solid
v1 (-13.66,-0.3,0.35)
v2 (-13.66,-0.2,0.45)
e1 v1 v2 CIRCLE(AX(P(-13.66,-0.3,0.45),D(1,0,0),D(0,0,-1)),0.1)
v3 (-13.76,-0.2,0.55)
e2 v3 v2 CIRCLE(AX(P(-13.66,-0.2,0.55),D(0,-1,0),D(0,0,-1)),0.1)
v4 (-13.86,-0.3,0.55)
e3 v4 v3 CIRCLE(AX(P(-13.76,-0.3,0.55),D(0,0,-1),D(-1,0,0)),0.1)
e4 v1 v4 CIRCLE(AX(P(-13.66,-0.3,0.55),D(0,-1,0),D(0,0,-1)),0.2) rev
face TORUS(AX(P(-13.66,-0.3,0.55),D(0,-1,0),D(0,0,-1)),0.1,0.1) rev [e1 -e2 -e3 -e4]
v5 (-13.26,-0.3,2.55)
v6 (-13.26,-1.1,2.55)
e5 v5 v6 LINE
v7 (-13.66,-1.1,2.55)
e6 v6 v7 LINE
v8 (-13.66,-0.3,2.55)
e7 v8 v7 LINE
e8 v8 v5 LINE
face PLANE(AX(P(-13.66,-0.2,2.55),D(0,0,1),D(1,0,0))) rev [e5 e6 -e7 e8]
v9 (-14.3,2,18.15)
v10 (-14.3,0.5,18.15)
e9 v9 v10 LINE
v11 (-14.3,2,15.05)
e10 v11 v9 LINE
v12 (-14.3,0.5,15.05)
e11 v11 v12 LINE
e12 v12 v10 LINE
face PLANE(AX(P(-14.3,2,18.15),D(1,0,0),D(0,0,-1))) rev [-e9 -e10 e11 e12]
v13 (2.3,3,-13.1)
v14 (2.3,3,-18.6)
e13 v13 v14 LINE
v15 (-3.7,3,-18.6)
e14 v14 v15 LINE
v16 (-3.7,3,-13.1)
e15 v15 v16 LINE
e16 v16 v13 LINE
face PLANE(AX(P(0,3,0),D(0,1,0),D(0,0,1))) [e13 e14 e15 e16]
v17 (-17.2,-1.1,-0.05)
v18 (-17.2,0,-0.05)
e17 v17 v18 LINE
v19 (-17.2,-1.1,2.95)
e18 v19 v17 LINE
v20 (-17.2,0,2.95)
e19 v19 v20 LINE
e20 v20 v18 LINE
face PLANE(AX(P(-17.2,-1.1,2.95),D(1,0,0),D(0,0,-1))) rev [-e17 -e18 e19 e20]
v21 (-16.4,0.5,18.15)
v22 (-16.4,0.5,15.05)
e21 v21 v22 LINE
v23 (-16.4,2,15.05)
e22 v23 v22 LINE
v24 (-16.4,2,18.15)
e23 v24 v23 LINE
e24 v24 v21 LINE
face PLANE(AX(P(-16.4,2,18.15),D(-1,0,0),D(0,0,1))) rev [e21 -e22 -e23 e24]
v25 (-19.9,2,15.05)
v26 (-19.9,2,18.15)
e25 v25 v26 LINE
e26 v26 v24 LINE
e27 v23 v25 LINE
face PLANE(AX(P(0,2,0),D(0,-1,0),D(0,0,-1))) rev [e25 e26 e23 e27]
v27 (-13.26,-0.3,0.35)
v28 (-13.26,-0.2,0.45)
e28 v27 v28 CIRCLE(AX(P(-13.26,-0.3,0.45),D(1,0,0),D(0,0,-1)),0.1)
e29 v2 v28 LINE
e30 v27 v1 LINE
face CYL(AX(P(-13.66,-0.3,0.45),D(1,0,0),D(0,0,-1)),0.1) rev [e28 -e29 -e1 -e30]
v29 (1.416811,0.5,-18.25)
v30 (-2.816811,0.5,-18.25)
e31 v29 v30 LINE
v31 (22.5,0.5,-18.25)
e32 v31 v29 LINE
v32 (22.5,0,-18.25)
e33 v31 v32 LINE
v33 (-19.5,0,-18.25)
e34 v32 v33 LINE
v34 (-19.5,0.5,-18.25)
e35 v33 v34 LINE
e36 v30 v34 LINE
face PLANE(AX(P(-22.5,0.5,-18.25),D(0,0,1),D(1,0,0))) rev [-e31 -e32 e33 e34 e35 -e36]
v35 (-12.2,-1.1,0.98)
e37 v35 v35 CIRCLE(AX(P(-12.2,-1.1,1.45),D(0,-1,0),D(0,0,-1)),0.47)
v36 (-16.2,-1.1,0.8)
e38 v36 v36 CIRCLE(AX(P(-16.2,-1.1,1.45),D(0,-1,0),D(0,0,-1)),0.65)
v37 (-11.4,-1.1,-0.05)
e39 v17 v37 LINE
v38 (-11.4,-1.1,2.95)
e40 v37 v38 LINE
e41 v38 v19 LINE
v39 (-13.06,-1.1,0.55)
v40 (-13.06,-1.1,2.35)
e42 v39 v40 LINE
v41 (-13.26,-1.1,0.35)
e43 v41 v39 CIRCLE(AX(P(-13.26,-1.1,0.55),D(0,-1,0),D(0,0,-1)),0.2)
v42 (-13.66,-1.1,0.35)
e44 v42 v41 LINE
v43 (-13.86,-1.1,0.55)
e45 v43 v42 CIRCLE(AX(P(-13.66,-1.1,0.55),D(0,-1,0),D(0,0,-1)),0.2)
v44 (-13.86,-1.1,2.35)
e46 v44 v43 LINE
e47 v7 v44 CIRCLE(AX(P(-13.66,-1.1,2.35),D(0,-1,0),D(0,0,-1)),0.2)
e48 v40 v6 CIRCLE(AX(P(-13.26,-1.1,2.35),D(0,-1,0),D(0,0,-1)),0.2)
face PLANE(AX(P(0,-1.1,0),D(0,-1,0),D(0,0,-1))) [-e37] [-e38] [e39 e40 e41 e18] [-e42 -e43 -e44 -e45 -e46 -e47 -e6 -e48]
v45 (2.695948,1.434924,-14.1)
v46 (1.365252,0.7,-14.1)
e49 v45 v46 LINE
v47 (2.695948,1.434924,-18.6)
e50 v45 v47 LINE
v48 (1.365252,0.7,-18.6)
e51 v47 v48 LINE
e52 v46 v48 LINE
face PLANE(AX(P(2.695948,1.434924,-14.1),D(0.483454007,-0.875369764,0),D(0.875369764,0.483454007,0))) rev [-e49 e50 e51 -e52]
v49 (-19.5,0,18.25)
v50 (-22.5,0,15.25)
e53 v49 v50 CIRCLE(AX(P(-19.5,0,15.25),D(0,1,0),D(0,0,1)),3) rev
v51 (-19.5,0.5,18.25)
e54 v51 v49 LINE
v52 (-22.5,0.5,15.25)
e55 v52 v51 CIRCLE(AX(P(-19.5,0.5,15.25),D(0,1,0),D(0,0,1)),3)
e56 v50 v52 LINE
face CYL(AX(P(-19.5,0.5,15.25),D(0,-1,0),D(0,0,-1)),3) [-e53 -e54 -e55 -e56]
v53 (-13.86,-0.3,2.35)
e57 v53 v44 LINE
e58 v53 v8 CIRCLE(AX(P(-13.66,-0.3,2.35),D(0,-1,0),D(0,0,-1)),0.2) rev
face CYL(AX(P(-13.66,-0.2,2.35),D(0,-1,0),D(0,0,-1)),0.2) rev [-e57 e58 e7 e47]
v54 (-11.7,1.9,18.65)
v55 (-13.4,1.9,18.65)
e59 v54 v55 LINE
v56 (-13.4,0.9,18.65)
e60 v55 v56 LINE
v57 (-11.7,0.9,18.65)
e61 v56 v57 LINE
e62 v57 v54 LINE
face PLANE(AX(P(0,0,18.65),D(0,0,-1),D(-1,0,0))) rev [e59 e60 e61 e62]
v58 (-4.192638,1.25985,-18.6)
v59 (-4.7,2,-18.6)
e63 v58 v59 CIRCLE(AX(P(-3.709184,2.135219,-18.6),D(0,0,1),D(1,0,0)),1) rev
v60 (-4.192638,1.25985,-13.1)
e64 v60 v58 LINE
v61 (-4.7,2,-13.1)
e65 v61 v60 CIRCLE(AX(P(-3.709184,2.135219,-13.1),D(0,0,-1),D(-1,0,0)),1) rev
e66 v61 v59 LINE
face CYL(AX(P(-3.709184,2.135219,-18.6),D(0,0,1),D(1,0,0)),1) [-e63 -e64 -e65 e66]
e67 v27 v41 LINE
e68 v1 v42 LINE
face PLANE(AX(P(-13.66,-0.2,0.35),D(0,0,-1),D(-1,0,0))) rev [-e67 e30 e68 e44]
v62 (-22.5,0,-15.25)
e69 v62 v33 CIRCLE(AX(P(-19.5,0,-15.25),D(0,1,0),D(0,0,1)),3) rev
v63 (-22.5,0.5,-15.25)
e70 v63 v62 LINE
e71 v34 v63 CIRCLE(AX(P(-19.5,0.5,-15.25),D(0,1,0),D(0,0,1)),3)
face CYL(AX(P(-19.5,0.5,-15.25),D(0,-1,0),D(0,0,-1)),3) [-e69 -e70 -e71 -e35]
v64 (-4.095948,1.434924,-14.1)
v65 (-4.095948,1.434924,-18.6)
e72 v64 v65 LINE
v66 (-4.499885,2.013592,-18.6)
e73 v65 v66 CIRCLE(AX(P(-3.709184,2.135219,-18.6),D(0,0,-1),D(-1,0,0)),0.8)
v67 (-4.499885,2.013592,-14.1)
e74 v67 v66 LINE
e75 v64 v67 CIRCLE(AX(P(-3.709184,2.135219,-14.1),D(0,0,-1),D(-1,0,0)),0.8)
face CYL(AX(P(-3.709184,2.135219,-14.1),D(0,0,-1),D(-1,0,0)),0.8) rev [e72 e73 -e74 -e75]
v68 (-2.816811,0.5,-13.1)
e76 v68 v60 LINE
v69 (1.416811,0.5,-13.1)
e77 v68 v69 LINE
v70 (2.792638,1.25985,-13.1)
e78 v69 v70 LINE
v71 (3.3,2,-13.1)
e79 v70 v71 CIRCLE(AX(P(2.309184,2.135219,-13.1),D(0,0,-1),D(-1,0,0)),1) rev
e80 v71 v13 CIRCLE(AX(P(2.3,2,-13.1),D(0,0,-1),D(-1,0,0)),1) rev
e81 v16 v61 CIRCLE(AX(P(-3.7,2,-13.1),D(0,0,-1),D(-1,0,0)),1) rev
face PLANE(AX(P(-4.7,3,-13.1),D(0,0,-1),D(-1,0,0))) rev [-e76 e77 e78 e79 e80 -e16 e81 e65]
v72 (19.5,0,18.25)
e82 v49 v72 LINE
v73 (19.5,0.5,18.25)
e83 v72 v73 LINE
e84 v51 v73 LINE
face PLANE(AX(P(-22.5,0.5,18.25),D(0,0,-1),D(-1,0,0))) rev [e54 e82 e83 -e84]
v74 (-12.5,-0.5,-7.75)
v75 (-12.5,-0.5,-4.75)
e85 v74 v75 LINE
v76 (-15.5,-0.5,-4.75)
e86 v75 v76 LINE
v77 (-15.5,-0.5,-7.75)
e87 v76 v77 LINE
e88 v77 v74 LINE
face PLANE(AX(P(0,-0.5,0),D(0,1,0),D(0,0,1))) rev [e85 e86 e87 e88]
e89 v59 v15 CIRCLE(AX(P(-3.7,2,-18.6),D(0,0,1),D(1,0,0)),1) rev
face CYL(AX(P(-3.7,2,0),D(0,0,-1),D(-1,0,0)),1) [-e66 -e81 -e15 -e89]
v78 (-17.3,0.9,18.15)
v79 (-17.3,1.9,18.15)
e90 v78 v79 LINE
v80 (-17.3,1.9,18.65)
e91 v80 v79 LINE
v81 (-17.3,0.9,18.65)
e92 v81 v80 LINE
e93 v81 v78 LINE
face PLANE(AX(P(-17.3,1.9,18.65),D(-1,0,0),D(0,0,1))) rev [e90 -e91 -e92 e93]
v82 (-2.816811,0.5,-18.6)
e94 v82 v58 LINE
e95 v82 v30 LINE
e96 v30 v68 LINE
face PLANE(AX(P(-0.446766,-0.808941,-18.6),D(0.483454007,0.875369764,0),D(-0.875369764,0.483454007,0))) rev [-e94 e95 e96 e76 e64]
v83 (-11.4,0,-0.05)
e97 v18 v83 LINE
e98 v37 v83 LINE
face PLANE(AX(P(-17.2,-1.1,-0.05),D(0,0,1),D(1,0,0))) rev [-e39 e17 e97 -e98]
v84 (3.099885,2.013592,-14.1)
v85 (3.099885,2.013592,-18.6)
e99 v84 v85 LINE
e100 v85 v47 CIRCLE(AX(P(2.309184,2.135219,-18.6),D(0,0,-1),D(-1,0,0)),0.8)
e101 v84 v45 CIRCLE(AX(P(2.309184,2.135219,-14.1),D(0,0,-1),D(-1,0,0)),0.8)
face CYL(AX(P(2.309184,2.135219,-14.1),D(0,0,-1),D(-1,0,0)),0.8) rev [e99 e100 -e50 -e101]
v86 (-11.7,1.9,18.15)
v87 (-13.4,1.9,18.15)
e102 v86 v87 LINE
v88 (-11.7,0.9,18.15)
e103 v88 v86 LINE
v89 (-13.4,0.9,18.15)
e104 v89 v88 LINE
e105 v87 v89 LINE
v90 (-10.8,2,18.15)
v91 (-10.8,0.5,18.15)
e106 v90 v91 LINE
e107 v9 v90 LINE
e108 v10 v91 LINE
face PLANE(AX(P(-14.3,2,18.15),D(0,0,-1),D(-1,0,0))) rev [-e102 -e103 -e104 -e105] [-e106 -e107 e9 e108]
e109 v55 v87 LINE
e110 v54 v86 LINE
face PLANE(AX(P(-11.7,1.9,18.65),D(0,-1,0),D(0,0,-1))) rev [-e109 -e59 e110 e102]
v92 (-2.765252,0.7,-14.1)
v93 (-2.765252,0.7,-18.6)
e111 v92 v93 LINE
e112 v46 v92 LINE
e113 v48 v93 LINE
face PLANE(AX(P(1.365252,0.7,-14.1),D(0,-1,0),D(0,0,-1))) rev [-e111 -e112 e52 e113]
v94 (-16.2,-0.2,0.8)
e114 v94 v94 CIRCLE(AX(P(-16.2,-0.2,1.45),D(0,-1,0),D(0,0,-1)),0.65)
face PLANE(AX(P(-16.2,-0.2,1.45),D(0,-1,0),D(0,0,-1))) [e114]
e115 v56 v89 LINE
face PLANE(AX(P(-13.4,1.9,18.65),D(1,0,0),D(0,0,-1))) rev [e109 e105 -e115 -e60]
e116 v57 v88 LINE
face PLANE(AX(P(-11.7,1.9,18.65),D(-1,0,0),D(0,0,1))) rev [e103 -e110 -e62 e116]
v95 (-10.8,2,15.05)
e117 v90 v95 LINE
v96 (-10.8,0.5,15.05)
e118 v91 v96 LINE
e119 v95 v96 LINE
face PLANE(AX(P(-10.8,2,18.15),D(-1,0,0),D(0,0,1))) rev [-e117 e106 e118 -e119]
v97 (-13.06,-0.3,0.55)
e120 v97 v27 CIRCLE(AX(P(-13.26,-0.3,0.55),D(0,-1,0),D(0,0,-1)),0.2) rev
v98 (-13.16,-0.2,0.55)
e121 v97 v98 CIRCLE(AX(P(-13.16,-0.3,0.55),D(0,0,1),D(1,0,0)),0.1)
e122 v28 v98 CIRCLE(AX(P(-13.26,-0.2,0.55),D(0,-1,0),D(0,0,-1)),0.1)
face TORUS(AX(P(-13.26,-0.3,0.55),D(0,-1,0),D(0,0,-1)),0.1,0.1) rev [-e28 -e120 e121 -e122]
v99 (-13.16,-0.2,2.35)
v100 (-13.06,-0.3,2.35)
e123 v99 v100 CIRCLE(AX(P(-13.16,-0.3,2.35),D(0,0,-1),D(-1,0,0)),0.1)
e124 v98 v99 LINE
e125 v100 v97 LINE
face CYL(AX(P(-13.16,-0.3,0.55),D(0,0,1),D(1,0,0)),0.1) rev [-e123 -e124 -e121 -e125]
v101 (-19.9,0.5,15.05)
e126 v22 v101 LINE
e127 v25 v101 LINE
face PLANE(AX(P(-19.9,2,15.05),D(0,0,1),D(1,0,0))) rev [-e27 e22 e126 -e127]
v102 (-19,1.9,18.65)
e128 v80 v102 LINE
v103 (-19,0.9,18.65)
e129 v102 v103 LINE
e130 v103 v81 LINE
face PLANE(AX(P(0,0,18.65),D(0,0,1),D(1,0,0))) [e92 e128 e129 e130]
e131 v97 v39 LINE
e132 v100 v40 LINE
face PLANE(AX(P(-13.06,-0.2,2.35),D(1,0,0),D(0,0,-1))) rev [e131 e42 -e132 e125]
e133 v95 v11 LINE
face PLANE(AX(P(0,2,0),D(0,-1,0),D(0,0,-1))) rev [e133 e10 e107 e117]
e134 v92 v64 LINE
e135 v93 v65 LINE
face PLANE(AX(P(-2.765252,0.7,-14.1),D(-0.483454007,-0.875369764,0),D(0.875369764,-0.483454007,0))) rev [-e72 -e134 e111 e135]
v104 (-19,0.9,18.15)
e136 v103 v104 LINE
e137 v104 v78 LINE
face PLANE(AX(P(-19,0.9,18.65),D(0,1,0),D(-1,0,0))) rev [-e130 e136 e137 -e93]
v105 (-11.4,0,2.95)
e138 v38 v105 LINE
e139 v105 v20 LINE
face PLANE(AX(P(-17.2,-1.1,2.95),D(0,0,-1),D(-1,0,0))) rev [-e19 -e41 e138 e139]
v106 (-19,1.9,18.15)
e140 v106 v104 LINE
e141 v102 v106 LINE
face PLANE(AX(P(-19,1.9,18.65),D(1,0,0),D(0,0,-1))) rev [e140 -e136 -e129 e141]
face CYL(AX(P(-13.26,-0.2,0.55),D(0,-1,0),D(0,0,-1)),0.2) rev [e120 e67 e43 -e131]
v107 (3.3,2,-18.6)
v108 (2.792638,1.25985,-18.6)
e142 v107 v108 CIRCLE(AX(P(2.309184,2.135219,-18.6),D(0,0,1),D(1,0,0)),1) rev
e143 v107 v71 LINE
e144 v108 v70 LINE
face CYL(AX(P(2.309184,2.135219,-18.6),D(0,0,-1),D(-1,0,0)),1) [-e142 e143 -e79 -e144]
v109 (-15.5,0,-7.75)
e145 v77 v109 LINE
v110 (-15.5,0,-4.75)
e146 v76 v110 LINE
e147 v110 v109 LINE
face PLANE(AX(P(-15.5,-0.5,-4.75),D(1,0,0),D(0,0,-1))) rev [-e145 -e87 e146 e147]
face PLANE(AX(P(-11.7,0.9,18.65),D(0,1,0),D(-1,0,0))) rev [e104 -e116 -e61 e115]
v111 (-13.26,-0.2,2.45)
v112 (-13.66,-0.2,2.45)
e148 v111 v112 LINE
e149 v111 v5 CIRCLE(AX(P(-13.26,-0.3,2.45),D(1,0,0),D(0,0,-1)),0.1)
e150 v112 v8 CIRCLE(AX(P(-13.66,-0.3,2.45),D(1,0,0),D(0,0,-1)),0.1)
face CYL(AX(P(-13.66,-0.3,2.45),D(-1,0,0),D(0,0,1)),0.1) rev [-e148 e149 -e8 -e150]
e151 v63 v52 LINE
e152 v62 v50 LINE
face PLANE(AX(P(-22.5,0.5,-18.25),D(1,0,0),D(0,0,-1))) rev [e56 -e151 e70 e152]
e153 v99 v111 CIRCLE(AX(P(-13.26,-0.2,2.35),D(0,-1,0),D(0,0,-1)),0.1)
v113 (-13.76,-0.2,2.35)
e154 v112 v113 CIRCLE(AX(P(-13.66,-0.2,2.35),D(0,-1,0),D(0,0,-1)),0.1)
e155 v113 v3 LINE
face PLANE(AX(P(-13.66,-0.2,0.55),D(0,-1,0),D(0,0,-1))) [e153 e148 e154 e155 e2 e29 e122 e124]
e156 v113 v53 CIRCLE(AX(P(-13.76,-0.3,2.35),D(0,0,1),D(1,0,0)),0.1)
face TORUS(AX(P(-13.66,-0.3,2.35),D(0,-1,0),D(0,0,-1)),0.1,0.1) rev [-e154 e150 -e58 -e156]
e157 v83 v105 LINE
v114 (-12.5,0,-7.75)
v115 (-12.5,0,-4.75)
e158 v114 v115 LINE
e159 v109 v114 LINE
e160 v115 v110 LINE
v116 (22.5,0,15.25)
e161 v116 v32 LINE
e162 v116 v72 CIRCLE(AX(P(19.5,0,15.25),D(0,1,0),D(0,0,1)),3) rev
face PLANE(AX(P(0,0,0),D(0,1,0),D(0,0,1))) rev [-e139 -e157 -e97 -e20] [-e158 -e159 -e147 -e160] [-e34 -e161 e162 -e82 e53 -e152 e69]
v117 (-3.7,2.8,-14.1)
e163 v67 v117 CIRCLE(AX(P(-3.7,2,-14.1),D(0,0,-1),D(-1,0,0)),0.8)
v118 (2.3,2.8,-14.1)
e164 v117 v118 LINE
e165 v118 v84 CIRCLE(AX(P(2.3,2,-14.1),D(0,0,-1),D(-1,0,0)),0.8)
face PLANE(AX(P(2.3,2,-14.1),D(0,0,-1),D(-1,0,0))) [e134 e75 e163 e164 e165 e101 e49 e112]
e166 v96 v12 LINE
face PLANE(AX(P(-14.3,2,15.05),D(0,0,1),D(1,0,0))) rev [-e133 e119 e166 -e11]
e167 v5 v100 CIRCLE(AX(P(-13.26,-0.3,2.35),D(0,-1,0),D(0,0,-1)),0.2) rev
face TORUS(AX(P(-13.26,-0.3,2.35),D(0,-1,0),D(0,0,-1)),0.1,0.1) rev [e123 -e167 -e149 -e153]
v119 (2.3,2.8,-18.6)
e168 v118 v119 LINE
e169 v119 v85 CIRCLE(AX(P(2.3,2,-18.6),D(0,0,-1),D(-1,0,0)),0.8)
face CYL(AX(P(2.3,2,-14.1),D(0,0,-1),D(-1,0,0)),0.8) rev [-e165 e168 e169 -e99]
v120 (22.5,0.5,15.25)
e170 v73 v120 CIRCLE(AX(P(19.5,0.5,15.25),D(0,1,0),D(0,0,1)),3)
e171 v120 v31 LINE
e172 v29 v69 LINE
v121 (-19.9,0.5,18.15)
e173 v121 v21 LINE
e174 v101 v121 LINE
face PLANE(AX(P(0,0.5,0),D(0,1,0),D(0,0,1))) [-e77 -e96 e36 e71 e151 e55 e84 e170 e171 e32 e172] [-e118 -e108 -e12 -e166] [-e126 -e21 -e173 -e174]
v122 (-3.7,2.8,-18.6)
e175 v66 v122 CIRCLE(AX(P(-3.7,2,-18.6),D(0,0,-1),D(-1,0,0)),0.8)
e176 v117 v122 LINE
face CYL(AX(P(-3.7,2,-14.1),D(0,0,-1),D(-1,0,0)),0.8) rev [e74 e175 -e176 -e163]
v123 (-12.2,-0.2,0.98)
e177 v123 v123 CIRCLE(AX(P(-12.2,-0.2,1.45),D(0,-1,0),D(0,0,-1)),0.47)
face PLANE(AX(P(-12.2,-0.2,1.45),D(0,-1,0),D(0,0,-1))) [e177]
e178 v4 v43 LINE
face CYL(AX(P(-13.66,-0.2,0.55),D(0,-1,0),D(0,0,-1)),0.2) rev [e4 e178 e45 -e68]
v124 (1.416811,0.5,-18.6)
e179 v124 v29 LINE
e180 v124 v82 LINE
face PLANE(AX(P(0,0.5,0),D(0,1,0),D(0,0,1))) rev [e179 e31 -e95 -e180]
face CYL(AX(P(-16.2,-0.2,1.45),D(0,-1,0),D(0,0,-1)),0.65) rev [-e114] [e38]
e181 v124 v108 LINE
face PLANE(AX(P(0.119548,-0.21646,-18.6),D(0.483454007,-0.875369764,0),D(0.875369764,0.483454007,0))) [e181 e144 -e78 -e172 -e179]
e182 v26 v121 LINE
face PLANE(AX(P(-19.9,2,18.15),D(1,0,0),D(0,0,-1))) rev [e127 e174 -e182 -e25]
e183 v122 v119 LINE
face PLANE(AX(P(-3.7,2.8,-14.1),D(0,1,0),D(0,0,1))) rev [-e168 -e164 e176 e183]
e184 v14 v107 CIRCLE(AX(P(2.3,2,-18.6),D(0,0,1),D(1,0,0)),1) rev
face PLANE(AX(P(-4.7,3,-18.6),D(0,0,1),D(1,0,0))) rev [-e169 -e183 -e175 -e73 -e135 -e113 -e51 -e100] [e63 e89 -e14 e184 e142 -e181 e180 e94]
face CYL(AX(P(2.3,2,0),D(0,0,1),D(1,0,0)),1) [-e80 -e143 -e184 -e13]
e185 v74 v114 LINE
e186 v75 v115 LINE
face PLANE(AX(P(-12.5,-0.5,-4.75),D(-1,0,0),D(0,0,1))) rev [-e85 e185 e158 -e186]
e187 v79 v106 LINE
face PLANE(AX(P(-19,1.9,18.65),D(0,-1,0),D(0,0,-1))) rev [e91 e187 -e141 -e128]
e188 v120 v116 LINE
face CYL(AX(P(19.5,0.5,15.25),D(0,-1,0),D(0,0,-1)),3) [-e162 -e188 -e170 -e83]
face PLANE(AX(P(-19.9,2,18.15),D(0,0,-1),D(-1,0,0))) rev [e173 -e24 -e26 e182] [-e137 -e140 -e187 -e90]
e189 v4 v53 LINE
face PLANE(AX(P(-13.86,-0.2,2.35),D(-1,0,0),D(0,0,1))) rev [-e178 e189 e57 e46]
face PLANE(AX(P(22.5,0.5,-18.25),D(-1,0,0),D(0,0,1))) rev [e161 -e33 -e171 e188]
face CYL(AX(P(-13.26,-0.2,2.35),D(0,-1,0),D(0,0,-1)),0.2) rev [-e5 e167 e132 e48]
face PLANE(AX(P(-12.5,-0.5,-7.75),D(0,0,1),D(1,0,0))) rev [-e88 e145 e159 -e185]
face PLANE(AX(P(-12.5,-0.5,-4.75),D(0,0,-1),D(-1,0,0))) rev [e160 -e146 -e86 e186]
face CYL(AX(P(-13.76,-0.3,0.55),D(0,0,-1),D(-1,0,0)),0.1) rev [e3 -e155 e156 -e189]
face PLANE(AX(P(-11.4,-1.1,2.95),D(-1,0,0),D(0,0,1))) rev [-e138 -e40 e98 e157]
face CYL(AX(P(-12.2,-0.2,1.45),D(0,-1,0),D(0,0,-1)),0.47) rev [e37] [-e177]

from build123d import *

# Parameters (mm, degrees)
SKETCH_1_W          = 45
SKETCH_1_H          = 36.5
EXTRUDE_1_DEPTH     = 0.5
FILLET_1_R          = 3
SKETCH_2_W          = 5.8
SKETCH_2_H          = 3
EXTRUDE_2_DEPTH     = 1.1
SKETCH_3_R          = 0.65
SKETCH_3_R_2        = 0.47
CUT_EXTRUDE_1_DEPTH = 0.9
FILLET_2_R          = 0.1
SKETCH_4_W          = 3
SKETCH_4_H          = 3
EXTRUDE_3_DEPTH     = 0.5
SKETCH_5_W          = 8
SKETCH_5_H          = 5.5
EXTRUDE_4_DEPTH     = 2.5
FILLET_3_R          = 1
CUT_EXTRUDE_2_DEPTH = 39.704941545
FILLET_4_R          = 1
CUT_EXTRUDE_3_DEPTH = 4.5
SKETCH_9_W          = 3.5
SKETCH_9_H          = 3.1
EXTRUDE_5_DEPTH     = 1.5
SKETCH_10_W         = 1.7
SKETCH_10_H         = 1
EXTRUDE_6_DEPTH     = 0.5


with BuildPart() as part:
    # Эскиз1 → Бобышка-Вытянуть1 (new body)
    with BuildSketch(Plane(origin=(0, 0, 0), x_dir=(1, 0, 0), z_dir=(0, 1, 0))):
        Rectangle(SKETCH_1_W, SKETCH_1_H)
    extrude(amount=EXTRUDE_1_DEPTH)

    # Скругление1
    fillet_1_edges = [part.edges().sort_by_distance(p)[0] for p in [
        (22.5, 0.25, 18.25),
        (-22.5, 0.25, 18.25),
        (-22.5, 0.25, -18.25),
    ]]
    fillet(fillet_1_edges, radius=FILLET_1_R)

    # Эскиз2 → Бобышка-Вытянуть2 (add)
    with BuildSketch(Plane.XZ):
        with Locations((-14.3, 1.45)):
            Rectangle(SKETCH_2_W, SKETCH_2_H)
    extrude(amount=EXTRUDE_2_DEPTH)

    # Эскиз3 → Вырез-Вытянуть1 (cut)
    with BuildSketch(Plane.XZ.offset(1.1)):
        with Locations(Location((-16.2, 1.45, 0), (0, 0, 270))):
            Circle(SKETCH_3_R)
        with Locations(Location((-12.2, 1.45, 0), (0, 0, 270))):
            Circle(SKETCH_3_R_2)
        with BuildLine():
            Line((-13.66, 2.55), (-13.26, 2.55))
            ThreePointArc((-13.26, 2.55), (-13.118578644, 2.491421356), (-13.06, 2.35))
            Line((-13.06, 2.35), (-13.06, 0.55))
            ThreePointArc((-13.06, 0.55), (-13.118578644, 0.408578644), (-13.26, 0.35))
            Line((-13.26, 0.35), (-13.66, 0.35))
            ThreePointArc((-13.66, 0.35), (-13.801421356, 0.408578644), (-13.86, 0.55))
            Line((-13.86, 0.55), (-13.86, 2.35))
            ThreePointArc((-13.86, 2.35), (-13.801421356, 2.491421356), (-13.66, 2.55))
        make_face()
    extrude(amount=-CUT_EXTRUDE_1_DEPTH, mode=Mode.SUBTRACT)

    # Скругление2
    fillet_2_edges = [part.edges().sort_by_distance(p)[0] for p in [
        (-13.801421356, -0.2, 0.408578644),
        (-13.86, -0.2, 1.45),
        (-13.801421356, -0.2, 2.491421356),
        (-13.46, -0.2, 2.55),
        (-13.118578644, -0.2, 2.491421356),
        (-13.06, -0.2, 1.45),
        (-13.118578644, -0.2, 0.408578644),
        (-13.46, -0.2, 0.35),
    ]]
    fillet(fillet_2_edges, radius=FILLET_2_R)

    # Эскиз4 → Бобышка-Вытянуть3 (add)
    with BuildSketch(Plane.XZ):
        with Locations((-14, -6.25)):
            Rectangle(SKETCH_4_W, SKETCH_4_H)
    extrude(amount=EXTRUDE_3_DEPTH)

    # Эскиз5 → Бобышка-Вытянуть4 (add)
    with BuildSketch(Plane(origin=(0, 0.5, 0), x_dir=(1, 0, 0), z_dir=(0, 1, 0))):
        with Locations((-0.7, 15.85)):
            Rectangle(SKETCH_5_W, SKETCH_5_H)
    extrude(amount=EXTRUDE_4_DEPTH)

    # Скругление3
    fillet_3_edges = [part.edges().sort_by_distance(p)[0] for p in [
        (3.3, 3, -15.85),
        (-4.7, 3, -15.85),
    ]]
    fillet(fillet_3_edges, radius=FILLET_3_R)

    # Эскиз6 → Вырез-Вытянуть2 (cut, through all)
    with BuildSketch(Plane.XY.offset(-13.1)):
        Polygon((-4.7, 0.5), (-2.816810686, 0.5), (-4.7, 1.540058106), align=None)
        Polygon((3.3, 1.540058106), (1.416810686, 0.5), (3.3, 0.5), align=None)
    extrude(amount=-CUT_EXTRUDE_2_DEPTH, mode=Mode.SUBTRACT)

    # Скругление4
    # the kernel refuses this fillet: 1 mm, written as the material it takes off along each edge
    with BuildSketch(Plane(origin=(3.3, 1.540058106, -11.651007536), x_dir=(-0.8753697639222053, -0.48345400651021836, 0), z_dir=(0, 0, -1))) as fillet_4_piece_1:
        with BuildLine():
            CenterArc((0.579596986, 1), FILLET_4_R, 216.682538738, 53.317461262)
            Line((-0.222360751, 0.402619227), (-0.238399906, 0.390671612))
            ThreePointArc((-0.238399906, 0.390671612), (-0.128687771, 0.191640533), (-0.017507395, -0.00966908))
            Line((-0.017507395, -0.00966908), (0, -0.02))
            Line((0, -0.02), (0.579596986, -0.02))
            Line((0.579596986, -0.02), (0.579596986, 0))
        make_face()
    extrude(amount=8.397984929, mode=Mode.SUBTRACT)
    with BuildSketch(Plane(origin=(-4.7, 1.540058106, -11.651007536), x_dir=(0, 1, 0), z_dir=(0, 0, -1))) as fillet_4_piece_2:
        with BuildLine():
            CenterArc((0.595161279, 0.990815683), FILLET_4_R, 208.911232689, 53.317461262)
            Line((-0.280208485, 0.507361677), (-0.29771588, 0.497692596))
            Line((-0.29771588, 0.497692596), (-0.017507395, -0.00966908))
            Line((-0.017507395, -0.00966908), (0, -0.02))
            ThreePointArc((0, -0.02), (0.229970947, -0.02), (0.457237506, -0.019816314))
            Line((0.457237506, -0.019816314), (0.459941894, 0))
        make_face()
    extrude(amount=8.397984929, mode=Mode.SUBTRACT)

    # Эскиз8 → Вырез-Вытянуть3 (cut)
    with BuildSketch(Plane(origin=(0, 0, -18.6), x_dir=(-1, 0, 0), z_dir=(0, 0, -1))):
        with BuildLine():
            Line((-2.695947522, 1.434923574), (-1.365252427, 0.7))
            Line((-1.365252427, 0.7), (2.765252427, 0.7))
            Line((2.765252427, 0.7), (4.095947522, 1.434923574))
            ThreePointArc((4.095947522, 1.434923574), (4.365171631, 1.677310395), (4.499884525, 2.013592163))
            ThreePointArc((4.499884525, 2.013592163), (4.260859282, 2.57047074), (3.7, 2.8))
            Line((3.7, 2.8), (-2.3, 2.8))
            ThreePointArc((-2.3, 2.8), (-2.860859282, 2.57047074), (-3.099884525, 2.013592163))
            ThreePointArc((-3.099884525, 2.013592163), (-2.965171631, 1.677310395), (-2.695947522, 1.434923574))
        make_face()
    extrude(amount=-CUT_EXTRUDE_3_DEPTH, mode=Mode.SUBTRACT)

    # Эскиз9 → Бобышка-Вытянуть5 (add)
    with BuildSketch(Plane(origin=(0, 0.5, 0), x_dir=(1, 0, 0), z_dir=(0, 1, 0))):
        with Locations((-18.15, -16.6)):
            Rectangle(SKETCH_9_W, SKETCH_9_H)
        with Locations((-12.55, -16.6)):
            Rectangle(SKETCH_9_W, SKETCH_9_H)
    extrude(amount=EXTRUDE_5_DEPTH)

    # Эскиз10 → Бобышка-Вытянуть6 (add)
    with BuildSketch(Plane.XY.offset(18.15)):
        with Locations((-18.15, 1.4)):
            Rectangle(SKETCH_10_W, SKETCH_10_H)
        with Locations((-12.55, 1.4)):
            Rectangle(SKETCH_10_W, SKETCH_10_H)
    extrude(amount=EXTRUDE_6_DEPTH)


solid = part.part
